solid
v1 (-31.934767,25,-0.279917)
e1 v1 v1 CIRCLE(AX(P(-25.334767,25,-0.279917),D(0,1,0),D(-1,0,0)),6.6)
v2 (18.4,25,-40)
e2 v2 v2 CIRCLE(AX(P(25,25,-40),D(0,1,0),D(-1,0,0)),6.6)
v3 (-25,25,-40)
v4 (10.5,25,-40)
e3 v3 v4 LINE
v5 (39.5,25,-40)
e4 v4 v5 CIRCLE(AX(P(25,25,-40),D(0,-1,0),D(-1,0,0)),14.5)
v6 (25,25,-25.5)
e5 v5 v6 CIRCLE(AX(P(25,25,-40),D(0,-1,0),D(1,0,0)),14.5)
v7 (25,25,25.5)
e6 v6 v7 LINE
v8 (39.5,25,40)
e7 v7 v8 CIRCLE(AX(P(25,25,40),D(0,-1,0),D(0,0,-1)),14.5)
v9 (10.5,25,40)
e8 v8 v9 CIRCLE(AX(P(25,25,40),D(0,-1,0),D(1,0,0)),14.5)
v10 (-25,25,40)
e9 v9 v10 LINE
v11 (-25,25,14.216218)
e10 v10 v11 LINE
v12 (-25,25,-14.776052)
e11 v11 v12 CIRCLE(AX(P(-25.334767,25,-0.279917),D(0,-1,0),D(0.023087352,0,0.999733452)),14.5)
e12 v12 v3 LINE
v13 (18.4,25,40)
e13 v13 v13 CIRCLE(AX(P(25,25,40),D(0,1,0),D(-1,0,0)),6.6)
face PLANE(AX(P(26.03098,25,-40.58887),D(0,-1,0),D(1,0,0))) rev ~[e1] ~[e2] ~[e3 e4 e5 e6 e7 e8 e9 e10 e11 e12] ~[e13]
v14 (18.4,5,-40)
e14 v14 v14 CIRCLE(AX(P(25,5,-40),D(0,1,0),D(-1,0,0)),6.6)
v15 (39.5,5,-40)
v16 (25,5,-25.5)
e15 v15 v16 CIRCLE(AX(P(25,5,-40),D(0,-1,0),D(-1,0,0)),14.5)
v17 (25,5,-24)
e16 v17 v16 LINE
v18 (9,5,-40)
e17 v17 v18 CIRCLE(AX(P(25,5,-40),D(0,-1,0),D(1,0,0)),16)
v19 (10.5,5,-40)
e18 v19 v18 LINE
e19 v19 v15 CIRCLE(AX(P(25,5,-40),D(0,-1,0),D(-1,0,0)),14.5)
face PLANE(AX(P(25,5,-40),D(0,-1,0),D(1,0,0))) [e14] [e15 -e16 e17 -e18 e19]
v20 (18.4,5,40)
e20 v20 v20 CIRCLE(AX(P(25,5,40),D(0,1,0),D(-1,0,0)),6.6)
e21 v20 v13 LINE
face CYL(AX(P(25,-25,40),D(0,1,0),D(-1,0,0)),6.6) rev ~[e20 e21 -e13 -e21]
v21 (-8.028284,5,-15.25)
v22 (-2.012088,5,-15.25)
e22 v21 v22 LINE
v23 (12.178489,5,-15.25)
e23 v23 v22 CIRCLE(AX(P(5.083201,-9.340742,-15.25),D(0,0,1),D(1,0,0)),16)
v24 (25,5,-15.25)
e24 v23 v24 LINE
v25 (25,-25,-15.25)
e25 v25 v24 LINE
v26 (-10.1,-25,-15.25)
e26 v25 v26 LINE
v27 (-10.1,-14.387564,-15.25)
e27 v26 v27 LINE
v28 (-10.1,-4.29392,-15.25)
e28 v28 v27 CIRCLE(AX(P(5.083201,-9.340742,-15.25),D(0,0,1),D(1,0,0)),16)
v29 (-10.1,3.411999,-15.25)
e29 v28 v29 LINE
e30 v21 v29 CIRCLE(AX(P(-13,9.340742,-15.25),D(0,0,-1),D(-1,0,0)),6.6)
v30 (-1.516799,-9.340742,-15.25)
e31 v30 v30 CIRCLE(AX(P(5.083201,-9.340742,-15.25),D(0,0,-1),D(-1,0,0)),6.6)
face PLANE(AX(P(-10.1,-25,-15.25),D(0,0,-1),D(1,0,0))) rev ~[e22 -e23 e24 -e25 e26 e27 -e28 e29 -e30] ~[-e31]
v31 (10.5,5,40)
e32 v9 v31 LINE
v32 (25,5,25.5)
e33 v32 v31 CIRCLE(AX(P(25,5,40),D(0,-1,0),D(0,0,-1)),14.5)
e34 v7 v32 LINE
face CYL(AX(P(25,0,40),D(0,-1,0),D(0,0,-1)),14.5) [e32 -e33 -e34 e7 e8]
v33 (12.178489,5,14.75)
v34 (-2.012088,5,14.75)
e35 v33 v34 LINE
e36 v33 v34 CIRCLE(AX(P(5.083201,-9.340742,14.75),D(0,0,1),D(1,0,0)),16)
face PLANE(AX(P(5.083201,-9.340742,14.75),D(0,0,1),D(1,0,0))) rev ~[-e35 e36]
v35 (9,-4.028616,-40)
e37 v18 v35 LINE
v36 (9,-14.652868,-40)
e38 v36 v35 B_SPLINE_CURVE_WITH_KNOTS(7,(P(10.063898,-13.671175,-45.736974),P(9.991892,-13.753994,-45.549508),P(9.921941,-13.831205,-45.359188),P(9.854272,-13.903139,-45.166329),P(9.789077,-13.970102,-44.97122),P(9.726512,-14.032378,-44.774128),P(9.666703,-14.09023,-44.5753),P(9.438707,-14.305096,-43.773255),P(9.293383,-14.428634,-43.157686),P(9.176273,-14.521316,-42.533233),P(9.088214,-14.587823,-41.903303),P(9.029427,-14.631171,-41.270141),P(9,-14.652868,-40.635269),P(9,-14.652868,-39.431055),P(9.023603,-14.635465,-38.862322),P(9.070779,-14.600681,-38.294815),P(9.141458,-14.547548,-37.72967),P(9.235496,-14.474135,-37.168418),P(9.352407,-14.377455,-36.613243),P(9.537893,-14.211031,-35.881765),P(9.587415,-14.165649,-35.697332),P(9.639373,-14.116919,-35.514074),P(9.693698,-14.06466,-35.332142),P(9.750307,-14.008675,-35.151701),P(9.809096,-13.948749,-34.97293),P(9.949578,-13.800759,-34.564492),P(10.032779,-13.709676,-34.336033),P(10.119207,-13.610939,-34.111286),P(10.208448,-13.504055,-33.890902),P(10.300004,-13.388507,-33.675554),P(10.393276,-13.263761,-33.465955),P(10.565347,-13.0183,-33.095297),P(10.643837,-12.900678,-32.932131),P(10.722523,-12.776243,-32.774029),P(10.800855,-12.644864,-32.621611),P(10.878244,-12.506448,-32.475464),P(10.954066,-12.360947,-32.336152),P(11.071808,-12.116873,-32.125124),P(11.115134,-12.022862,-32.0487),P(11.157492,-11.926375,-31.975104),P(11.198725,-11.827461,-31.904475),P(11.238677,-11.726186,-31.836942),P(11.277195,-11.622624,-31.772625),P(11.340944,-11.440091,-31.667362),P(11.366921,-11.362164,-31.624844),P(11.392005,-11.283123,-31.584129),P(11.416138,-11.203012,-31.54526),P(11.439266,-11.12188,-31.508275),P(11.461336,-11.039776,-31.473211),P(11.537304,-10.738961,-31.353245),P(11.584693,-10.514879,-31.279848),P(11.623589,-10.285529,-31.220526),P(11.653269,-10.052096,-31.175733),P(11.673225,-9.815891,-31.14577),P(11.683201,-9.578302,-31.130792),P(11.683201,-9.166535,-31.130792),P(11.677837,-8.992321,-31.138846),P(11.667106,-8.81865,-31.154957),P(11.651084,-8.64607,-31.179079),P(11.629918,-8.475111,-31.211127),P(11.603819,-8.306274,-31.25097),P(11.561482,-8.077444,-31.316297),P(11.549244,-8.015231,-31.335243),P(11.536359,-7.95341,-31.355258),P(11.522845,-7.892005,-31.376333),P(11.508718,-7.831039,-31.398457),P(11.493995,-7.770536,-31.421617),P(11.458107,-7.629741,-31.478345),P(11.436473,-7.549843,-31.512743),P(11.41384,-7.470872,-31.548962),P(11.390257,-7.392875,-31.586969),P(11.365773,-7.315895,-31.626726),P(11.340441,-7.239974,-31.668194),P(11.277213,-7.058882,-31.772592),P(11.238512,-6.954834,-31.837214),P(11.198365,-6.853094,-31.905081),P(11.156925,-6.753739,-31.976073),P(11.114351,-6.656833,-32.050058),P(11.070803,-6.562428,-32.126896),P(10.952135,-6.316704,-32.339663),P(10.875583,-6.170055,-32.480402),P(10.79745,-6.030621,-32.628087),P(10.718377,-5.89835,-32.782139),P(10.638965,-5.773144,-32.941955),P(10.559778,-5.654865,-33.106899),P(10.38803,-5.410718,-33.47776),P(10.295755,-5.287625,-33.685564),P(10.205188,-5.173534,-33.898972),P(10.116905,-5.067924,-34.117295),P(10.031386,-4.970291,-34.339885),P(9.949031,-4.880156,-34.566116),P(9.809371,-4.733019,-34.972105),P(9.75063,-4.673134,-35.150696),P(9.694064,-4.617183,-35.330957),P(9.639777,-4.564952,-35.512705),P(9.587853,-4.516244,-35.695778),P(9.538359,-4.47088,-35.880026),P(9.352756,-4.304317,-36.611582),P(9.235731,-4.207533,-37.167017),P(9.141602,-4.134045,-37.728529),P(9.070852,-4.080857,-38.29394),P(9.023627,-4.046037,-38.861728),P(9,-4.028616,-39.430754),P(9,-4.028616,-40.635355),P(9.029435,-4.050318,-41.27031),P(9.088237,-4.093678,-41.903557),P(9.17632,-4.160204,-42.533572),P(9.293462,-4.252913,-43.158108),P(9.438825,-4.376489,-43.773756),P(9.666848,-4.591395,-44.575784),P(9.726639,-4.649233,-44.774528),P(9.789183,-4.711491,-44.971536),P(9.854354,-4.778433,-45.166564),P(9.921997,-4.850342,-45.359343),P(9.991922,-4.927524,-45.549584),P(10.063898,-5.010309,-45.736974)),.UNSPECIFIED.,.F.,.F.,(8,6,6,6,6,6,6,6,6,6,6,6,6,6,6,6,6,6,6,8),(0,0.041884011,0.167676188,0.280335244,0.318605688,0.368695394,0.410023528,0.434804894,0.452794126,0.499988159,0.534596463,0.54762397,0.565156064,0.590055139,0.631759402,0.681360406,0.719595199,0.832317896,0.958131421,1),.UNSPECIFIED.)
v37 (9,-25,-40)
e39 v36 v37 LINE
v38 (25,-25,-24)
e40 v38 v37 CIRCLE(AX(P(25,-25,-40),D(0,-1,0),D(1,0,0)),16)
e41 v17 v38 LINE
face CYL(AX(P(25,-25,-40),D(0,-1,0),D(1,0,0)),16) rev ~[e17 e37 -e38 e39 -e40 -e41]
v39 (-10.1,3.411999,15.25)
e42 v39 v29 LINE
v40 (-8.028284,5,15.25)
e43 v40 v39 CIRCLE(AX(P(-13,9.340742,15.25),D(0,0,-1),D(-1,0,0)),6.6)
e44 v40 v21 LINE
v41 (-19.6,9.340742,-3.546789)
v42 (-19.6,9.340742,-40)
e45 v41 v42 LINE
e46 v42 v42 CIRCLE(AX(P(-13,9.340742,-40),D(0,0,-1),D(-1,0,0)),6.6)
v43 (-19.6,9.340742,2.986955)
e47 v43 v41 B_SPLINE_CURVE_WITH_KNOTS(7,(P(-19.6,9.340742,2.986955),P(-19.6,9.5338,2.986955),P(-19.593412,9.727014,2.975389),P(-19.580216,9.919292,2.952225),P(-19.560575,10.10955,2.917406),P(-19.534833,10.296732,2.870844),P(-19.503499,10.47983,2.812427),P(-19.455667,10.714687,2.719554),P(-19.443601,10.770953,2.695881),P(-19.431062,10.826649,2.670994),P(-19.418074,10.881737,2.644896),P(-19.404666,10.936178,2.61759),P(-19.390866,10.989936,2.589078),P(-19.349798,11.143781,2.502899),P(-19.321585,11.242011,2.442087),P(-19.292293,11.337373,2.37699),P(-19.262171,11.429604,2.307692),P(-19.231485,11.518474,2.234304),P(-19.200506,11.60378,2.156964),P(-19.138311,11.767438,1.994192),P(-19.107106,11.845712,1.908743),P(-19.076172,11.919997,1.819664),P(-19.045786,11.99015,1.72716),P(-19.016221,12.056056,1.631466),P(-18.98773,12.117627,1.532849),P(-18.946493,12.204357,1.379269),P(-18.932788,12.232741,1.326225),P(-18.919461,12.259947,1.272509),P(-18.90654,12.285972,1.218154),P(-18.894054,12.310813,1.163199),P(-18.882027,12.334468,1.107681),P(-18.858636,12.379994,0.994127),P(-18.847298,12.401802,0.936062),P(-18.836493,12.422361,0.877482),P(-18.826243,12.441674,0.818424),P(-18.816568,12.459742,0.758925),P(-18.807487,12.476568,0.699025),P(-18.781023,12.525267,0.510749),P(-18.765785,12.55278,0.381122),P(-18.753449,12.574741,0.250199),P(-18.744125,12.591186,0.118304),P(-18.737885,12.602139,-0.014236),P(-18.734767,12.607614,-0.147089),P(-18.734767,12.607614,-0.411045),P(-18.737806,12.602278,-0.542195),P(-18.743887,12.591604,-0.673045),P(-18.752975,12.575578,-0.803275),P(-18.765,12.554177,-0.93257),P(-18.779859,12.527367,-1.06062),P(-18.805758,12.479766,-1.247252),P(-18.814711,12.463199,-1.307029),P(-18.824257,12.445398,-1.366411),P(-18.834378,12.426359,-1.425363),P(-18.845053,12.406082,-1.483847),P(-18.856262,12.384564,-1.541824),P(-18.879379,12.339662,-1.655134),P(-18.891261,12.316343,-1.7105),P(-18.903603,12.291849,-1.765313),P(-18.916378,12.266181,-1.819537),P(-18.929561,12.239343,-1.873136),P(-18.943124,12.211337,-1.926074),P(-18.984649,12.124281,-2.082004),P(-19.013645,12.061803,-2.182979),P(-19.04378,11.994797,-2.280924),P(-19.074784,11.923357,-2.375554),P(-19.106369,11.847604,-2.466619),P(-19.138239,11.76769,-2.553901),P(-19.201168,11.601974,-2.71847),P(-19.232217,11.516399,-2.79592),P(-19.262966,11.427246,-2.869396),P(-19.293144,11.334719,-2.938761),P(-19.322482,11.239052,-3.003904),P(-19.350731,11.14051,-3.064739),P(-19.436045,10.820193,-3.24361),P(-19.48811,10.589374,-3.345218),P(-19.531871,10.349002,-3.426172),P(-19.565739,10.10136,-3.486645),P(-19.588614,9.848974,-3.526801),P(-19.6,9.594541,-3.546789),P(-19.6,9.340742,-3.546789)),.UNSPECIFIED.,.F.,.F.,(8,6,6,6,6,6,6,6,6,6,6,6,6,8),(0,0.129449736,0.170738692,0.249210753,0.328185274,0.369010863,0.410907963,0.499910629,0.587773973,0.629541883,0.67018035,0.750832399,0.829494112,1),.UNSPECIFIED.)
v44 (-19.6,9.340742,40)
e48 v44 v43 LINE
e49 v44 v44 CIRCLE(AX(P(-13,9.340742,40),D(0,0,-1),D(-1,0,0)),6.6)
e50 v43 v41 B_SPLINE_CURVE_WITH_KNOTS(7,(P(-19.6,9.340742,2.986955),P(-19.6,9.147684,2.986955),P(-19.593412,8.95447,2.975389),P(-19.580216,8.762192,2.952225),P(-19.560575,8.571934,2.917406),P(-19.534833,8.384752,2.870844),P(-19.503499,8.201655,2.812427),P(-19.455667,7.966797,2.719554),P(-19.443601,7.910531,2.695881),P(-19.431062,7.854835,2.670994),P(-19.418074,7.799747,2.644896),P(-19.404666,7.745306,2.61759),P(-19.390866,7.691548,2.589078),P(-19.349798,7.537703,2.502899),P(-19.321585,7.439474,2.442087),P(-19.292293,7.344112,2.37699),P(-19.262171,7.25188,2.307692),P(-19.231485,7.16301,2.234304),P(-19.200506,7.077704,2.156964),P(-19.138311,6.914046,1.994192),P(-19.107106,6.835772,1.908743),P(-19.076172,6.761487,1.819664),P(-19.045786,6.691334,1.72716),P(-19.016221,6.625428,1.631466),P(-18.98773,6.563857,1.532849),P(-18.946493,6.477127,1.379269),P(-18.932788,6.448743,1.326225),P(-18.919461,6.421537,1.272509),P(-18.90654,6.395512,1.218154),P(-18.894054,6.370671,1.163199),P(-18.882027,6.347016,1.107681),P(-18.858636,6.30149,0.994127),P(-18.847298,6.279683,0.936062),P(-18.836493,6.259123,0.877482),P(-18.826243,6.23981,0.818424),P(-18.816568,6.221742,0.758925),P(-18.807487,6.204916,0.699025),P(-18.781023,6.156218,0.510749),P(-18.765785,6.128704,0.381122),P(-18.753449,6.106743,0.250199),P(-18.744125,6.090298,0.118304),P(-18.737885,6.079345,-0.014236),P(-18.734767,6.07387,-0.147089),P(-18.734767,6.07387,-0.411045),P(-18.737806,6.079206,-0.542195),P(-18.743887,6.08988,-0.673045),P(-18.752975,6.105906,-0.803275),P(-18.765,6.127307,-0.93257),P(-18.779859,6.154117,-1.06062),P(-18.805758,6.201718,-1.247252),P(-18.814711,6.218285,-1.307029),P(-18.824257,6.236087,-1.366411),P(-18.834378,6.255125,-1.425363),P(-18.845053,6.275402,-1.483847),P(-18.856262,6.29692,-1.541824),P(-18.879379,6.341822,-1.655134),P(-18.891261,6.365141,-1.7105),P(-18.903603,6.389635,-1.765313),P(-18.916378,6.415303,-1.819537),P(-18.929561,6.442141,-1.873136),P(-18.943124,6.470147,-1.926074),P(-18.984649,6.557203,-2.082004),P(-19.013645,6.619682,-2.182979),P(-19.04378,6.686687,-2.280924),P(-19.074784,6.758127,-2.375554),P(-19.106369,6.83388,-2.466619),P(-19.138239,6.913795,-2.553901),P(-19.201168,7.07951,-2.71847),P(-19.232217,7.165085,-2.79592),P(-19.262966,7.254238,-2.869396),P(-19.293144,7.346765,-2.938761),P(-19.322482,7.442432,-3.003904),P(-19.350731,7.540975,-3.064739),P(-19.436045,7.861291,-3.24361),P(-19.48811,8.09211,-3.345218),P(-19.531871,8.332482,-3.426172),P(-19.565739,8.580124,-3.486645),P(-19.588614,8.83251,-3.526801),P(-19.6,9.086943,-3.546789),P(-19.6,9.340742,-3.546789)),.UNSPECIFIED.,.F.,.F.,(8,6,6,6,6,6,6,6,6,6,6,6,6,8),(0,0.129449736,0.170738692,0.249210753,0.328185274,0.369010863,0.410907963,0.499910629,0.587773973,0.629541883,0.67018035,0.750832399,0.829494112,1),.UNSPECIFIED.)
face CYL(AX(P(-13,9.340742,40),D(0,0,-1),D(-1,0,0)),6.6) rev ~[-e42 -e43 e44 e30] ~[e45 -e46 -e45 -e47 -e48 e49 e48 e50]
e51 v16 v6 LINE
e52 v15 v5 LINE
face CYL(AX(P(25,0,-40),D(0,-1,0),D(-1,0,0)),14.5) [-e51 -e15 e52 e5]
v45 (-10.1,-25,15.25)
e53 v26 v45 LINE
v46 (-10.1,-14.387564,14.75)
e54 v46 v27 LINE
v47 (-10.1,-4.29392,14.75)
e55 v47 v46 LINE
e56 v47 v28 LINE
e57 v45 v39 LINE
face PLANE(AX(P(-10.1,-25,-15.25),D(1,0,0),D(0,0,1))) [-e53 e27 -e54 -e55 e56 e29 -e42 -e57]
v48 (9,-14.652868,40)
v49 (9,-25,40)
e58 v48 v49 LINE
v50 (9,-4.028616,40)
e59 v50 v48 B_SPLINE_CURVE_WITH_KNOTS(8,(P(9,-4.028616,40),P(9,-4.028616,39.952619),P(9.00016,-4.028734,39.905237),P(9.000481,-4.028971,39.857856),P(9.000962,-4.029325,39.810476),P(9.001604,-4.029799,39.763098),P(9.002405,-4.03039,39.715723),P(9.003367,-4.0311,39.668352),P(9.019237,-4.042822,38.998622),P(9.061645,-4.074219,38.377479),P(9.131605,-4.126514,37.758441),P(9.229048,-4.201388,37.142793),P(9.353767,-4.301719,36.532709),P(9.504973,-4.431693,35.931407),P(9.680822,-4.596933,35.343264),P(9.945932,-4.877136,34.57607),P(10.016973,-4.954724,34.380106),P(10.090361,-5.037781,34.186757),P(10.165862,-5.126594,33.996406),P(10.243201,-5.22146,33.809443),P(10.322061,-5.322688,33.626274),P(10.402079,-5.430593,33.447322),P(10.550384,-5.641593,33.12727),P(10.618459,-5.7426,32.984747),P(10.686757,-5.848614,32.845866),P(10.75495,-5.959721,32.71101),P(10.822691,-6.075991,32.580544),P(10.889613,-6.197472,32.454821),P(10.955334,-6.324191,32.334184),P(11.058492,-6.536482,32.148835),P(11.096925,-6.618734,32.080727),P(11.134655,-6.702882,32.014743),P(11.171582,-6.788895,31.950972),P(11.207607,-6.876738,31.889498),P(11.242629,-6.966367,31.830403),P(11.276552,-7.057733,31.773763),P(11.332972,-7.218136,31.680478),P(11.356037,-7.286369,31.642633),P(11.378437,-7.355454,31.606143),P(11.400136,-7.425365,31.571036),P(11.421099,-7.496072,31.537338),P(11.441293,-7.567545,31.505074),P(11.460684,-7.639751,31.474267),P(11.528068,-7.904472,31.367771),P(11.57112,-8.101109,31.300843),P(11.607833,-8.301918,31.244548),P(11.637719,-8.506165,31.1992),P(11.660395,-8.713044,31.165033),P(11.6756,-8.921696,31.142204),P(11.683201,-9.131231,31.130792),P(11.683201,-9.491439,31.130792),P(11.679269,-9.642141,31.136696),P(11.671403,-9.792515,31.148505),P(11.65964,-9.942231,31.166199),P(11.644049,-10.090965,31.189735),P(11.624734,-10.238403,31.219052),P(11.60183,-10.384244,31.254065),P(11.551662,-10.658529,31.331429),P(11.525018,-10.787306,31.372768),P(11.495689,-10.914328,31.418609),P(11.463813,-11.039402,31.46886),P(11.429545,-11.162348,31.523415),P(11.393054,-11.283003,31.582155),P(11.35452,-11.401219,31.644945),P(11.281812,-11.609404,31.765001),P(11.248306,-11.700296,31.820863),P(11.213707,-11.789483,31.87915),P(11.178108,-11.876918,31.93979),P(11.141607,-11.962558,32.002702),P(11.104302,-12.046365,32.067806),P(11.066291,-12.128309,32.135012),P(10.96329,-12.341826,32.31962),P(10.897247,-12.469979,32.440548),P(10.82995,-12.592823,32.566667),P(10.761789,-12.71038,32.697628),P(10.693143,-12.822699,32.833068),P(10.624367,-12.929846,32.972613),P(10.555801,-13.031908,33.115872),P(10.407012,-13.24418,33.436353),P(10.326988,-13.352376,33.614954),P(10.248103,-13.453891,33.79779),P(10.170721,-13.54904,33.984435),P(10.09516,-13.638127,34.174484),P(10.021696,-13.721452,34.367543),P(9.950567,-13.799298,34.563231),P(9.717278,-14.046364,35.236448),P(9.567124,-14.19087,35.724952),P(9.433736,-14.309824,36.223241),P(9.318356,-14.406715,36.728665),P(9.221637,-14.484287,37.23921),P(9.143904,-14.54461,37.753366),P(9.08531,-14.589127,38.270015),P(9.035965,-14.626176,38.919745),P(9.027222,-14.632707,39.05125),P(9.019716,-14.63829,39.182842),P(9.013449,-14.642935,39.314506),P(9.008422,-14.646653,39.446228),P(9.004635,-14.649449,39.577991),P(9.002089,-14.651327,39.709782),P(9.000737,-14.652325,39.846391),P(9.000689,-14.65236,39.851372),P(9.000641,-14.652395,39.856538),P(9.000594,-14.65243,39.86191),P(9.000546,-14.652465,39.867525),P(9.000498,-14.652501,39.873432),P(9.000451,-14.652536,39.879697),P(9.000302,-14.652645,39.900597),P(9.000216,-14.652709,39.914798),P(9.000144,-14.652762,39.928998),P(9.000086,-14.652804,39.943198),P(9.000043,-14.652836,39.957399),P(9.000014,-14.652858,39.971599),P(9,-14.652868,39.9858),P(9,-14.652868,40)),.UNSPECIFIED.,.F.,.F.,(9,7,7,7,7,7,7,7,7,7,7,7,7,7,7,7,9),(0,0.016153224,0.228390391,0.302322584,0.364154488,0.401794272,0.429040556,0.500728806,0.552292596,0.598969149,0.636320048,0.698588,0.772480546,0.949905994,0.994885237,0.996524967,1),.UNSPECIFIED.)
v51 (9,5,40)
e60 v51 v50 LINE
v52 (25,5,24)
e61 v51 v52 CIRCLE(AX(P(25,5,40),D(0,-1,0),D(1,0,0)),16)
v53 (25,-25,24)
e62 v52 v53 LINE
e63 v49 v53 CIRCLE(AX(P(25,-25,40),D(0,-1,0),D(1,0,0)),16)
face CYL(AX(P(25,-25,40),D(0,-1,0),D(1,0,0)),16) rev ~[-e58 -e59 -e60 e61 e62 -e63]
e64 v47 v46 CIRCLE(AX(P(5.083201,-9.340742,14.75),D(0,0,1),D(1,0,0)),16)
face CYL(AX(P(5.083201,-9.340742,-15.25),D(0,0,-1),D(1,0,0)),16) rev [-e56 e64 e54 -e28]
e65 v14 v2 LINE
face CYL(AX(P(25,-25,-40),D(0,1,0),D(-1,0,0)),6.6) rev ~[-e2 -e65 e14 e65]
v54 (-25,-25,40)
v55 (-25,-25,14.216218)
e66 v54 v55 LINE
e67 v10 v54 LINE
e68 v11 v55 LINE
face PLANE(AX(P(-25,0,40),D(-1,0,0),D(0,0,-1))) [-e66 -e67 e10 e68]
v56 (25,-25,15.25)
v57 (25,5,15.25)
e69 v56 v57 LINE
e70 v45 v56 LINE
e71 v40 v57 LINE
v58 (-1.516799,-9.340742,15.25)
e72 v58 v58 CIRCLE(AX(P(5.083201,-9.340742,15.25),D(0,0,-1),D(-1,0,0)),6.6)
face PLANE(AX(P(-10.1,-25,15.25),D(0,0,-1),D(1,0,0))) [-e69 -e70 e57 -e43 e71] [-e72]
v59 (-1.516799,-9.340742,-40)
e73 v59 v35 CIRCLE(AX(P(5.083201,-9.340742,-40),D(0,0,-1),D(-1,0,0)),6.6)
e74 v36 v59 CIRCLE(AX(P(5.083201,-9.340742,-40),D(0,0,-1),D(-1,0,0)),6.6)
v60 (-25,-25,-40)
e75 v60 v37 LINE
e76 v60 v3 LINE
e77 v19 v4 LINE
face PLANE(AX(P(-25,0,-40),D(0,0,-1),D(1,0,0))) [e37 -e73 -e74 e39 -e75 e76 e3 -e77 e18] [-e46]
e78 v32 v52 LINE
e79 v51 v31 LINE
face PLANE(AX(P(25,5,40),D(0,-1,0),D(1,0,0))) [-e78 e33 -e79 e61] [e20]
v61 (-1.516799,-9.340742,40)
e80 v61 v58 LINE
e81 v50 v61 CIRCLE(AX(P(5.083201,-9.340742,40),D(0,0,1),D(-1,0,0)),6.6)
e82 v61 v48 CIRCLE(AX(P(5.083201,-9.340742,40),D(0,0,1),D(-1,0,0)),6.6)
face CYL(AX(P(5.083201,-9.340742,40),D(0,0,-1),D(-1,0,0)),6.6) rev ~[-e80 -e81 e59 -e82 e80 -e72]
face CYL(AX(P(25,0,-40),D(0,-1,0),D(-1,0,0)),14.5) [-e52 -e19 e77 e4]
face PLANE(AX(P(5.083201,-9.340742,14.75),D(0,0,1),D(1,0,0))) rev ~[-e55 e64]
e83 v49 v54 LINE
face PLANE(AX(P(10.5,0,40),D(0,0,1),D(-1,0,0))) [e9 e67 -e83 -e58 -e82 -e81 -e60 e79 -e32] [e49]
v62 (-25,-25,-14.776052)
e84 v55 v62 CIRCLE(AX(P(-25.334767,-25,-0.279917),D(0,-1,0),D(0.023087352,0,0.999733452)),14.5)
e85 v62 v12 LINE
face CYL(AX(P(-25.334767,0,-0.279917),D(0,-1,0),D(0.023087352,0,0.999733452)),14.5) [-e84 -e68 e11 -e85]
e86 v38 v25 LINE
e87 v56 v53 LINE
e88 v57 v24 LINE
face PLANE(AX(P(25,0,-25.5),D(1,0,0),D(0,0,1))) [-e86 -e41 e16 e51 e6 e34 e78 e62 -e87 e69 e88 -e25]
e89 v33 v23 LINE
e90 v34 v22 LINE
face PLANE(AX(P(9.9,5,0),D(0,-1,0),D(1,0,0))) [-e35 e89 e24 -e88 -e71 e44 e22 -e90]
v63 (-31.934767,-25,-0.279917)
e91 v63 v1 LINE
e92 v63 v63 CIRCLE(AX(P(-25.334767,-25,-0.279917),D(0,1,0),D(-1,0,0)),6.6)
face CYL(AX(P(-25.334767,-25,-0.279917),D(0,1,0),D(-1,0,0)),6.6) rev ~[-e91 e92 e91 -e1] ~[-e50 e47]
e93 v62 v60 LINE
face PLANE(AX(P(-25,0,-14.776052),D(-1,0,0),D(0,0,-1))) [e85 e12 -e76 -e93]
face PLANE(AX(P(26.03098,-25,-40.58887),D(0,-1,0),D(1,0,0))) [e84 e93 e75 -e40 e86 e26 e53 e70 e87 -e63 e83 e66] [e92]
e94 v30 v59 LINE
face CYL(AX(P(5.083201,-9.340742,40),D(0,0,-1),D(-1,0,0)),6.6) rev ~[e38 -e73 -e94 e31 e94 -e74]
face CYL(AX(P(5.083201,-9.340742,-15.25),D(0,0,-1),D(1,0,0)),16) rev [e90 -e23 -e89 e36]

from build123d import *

# Parameters (mm, degrees)
F1_DEPTH       = 25
F3_D           = 13.2
F3_CBORE_D     = 19.25
F3_CBORE_DEPTH = 0
F5_D           = 13.2
F5_CBORE_D     = 19.25
F5_CBORE_DEPTH = 0
F6_W           = 40
F6_H           = 30.5
F7_DEPTH       = 30
F8_R           = 16
F9_DEPTH       = 30
F10_R          = 16
F11_DEPTH      = 30


with BuildPart() as f1:
    # F0 (on Front) → F1 (new body, symmetric)
    with BuildSketch(Plane.XZ):
        with BuildLine():
            Line((25, -25.5), (25, -40))
            Line((25, -40), (10.5, -40))
            ThreePointArc((10.5, -40), (25, -54.5), (39.5, -40))
            ThreePointArc((39.5, -40), (35.2530483272, -29.7469516728), (25, -25.5))
        make_face()
        with BuildLine():
            Line((10.5, -40), (25, -40))
            Line((25, -40), (25, -25.5))
            ThreePointArc((25, -25.5), (14.7469516728, -29.7469516728), (10.5, -40))
        make_face()
        with BuildLine():
            Line((-25, -40), (10.5, -40))
            ThreePointArc((10.5, -40), (14.7469516728, -29.7469516728), (25, -25.5))
            Line((25, -25.5), (25, 25.5))
            ThreePointArc((25, 25.5), (14.7469516728, 29.7469516728), (10.5, 40))
            Line((10.5, 40), (-25, 40))
            Line((-25, 40), (-25, 14.2162181315))
            ThreePointArc((-25, 14.2162181315), (-14.9640357801, 9.8540823977), (-10.8347666082, -0.279916916))
            ThreePointArc((-10.8347666082, -0.279916916), (-14.9640357801, -10.4139162298), (-25, -14.7760519636))
            Line((-25, -14.7760519636), (-25, -40))
        make_face()
        with BuildLine():
            ThreePointArc((10.5, 40), (14.7469516728, 29.7469516728), (25, 25.5))
            Line((25, 25.5), (25, 40))
            Line((25, 40), (10.5, 40))
        make_face()
        with BuildLine():
            Line((25, 40), (25, 25.5))
            ThreePointArc((25, 25.5), (35.2530483272, 29.7469516728), (39.5, 40))
            ThreePointArc((39.5, 40), (25, 54.5), (10.5, 40))
            Line((10.5, 40), (25, 40))
        make_face()
        with BuildLine():
            ThreePointArc((-25, 14.2162181315), (-39.8347666082, -0.279916916), (-25, -14.7760519636))
            Line((-25, -14.7760519636), (-25, 14.2162181315))
        make_face()
        with BuildLine():
            Line((-25, 14.2162181315), (-25, -14.7760519636))
            ThreePointArc((-25, -14.7760519636), (-14.9640357801, -10.4139162298), (-10.8347666082, -0.279916916))
            ThreePointArc((-10.8347666082, -0.279916916), (-14.9640357801, 9.8540823977), (-25, 14.2162181315))
        make_face()
    extrude(amount=F1_DEPTH, both=True)

    # F3 (through all)
    with Locations(Plane.XZ.offset(25)):
        with Locations((25, 40), (-25.3347666082, -0.279916916), (25, -40)):
            CounterBoreHole(F3_D / 2, F3_CBORE_D / 2, F3_CBORE_DEPTH)

    # F5 (through all)
    with Locations(Plane.XY.offset(40)):
        with Locations((-13, 9.3407420599), (5.0832007976, -9.3407420599)):
            CounterBoreHole(F5_D / 2, F5_CBORE_D / 2, F5_CBORE_DEPTH)

    # F6 (on face) → F7 (cut)
    with BuildSketch(Plane.XZ.offset(25)):
        with Locations((9.9, 0)):
            Rectangle(F6_W, F6_H)
    extrude(amount=-F7_DEPTH, mode=Mode.SUBTRACT)

    # F8 (on face) → F9 (cut)
    with BuildSketch(Plane.XY.offset(-15.25)):
        with Locations((5.0832007976, -9.3407420599)):
            Circle(F8_R)
    extrude(amount=F9_DEPTH, mode=Mode.SUBTRACT)

    # F10 (on face) → F11 (cut)
    with BuildSketch(Plane.XZ.offset(25)):
        with Locations((25, 40)):
            Circle(F10_R)
        with Locations((25, -40)):
            Circle(F10_R)
    extrude(amount=-F11_DEPTH, mode=Mode.SUBTRACT)


solid = f1.part
